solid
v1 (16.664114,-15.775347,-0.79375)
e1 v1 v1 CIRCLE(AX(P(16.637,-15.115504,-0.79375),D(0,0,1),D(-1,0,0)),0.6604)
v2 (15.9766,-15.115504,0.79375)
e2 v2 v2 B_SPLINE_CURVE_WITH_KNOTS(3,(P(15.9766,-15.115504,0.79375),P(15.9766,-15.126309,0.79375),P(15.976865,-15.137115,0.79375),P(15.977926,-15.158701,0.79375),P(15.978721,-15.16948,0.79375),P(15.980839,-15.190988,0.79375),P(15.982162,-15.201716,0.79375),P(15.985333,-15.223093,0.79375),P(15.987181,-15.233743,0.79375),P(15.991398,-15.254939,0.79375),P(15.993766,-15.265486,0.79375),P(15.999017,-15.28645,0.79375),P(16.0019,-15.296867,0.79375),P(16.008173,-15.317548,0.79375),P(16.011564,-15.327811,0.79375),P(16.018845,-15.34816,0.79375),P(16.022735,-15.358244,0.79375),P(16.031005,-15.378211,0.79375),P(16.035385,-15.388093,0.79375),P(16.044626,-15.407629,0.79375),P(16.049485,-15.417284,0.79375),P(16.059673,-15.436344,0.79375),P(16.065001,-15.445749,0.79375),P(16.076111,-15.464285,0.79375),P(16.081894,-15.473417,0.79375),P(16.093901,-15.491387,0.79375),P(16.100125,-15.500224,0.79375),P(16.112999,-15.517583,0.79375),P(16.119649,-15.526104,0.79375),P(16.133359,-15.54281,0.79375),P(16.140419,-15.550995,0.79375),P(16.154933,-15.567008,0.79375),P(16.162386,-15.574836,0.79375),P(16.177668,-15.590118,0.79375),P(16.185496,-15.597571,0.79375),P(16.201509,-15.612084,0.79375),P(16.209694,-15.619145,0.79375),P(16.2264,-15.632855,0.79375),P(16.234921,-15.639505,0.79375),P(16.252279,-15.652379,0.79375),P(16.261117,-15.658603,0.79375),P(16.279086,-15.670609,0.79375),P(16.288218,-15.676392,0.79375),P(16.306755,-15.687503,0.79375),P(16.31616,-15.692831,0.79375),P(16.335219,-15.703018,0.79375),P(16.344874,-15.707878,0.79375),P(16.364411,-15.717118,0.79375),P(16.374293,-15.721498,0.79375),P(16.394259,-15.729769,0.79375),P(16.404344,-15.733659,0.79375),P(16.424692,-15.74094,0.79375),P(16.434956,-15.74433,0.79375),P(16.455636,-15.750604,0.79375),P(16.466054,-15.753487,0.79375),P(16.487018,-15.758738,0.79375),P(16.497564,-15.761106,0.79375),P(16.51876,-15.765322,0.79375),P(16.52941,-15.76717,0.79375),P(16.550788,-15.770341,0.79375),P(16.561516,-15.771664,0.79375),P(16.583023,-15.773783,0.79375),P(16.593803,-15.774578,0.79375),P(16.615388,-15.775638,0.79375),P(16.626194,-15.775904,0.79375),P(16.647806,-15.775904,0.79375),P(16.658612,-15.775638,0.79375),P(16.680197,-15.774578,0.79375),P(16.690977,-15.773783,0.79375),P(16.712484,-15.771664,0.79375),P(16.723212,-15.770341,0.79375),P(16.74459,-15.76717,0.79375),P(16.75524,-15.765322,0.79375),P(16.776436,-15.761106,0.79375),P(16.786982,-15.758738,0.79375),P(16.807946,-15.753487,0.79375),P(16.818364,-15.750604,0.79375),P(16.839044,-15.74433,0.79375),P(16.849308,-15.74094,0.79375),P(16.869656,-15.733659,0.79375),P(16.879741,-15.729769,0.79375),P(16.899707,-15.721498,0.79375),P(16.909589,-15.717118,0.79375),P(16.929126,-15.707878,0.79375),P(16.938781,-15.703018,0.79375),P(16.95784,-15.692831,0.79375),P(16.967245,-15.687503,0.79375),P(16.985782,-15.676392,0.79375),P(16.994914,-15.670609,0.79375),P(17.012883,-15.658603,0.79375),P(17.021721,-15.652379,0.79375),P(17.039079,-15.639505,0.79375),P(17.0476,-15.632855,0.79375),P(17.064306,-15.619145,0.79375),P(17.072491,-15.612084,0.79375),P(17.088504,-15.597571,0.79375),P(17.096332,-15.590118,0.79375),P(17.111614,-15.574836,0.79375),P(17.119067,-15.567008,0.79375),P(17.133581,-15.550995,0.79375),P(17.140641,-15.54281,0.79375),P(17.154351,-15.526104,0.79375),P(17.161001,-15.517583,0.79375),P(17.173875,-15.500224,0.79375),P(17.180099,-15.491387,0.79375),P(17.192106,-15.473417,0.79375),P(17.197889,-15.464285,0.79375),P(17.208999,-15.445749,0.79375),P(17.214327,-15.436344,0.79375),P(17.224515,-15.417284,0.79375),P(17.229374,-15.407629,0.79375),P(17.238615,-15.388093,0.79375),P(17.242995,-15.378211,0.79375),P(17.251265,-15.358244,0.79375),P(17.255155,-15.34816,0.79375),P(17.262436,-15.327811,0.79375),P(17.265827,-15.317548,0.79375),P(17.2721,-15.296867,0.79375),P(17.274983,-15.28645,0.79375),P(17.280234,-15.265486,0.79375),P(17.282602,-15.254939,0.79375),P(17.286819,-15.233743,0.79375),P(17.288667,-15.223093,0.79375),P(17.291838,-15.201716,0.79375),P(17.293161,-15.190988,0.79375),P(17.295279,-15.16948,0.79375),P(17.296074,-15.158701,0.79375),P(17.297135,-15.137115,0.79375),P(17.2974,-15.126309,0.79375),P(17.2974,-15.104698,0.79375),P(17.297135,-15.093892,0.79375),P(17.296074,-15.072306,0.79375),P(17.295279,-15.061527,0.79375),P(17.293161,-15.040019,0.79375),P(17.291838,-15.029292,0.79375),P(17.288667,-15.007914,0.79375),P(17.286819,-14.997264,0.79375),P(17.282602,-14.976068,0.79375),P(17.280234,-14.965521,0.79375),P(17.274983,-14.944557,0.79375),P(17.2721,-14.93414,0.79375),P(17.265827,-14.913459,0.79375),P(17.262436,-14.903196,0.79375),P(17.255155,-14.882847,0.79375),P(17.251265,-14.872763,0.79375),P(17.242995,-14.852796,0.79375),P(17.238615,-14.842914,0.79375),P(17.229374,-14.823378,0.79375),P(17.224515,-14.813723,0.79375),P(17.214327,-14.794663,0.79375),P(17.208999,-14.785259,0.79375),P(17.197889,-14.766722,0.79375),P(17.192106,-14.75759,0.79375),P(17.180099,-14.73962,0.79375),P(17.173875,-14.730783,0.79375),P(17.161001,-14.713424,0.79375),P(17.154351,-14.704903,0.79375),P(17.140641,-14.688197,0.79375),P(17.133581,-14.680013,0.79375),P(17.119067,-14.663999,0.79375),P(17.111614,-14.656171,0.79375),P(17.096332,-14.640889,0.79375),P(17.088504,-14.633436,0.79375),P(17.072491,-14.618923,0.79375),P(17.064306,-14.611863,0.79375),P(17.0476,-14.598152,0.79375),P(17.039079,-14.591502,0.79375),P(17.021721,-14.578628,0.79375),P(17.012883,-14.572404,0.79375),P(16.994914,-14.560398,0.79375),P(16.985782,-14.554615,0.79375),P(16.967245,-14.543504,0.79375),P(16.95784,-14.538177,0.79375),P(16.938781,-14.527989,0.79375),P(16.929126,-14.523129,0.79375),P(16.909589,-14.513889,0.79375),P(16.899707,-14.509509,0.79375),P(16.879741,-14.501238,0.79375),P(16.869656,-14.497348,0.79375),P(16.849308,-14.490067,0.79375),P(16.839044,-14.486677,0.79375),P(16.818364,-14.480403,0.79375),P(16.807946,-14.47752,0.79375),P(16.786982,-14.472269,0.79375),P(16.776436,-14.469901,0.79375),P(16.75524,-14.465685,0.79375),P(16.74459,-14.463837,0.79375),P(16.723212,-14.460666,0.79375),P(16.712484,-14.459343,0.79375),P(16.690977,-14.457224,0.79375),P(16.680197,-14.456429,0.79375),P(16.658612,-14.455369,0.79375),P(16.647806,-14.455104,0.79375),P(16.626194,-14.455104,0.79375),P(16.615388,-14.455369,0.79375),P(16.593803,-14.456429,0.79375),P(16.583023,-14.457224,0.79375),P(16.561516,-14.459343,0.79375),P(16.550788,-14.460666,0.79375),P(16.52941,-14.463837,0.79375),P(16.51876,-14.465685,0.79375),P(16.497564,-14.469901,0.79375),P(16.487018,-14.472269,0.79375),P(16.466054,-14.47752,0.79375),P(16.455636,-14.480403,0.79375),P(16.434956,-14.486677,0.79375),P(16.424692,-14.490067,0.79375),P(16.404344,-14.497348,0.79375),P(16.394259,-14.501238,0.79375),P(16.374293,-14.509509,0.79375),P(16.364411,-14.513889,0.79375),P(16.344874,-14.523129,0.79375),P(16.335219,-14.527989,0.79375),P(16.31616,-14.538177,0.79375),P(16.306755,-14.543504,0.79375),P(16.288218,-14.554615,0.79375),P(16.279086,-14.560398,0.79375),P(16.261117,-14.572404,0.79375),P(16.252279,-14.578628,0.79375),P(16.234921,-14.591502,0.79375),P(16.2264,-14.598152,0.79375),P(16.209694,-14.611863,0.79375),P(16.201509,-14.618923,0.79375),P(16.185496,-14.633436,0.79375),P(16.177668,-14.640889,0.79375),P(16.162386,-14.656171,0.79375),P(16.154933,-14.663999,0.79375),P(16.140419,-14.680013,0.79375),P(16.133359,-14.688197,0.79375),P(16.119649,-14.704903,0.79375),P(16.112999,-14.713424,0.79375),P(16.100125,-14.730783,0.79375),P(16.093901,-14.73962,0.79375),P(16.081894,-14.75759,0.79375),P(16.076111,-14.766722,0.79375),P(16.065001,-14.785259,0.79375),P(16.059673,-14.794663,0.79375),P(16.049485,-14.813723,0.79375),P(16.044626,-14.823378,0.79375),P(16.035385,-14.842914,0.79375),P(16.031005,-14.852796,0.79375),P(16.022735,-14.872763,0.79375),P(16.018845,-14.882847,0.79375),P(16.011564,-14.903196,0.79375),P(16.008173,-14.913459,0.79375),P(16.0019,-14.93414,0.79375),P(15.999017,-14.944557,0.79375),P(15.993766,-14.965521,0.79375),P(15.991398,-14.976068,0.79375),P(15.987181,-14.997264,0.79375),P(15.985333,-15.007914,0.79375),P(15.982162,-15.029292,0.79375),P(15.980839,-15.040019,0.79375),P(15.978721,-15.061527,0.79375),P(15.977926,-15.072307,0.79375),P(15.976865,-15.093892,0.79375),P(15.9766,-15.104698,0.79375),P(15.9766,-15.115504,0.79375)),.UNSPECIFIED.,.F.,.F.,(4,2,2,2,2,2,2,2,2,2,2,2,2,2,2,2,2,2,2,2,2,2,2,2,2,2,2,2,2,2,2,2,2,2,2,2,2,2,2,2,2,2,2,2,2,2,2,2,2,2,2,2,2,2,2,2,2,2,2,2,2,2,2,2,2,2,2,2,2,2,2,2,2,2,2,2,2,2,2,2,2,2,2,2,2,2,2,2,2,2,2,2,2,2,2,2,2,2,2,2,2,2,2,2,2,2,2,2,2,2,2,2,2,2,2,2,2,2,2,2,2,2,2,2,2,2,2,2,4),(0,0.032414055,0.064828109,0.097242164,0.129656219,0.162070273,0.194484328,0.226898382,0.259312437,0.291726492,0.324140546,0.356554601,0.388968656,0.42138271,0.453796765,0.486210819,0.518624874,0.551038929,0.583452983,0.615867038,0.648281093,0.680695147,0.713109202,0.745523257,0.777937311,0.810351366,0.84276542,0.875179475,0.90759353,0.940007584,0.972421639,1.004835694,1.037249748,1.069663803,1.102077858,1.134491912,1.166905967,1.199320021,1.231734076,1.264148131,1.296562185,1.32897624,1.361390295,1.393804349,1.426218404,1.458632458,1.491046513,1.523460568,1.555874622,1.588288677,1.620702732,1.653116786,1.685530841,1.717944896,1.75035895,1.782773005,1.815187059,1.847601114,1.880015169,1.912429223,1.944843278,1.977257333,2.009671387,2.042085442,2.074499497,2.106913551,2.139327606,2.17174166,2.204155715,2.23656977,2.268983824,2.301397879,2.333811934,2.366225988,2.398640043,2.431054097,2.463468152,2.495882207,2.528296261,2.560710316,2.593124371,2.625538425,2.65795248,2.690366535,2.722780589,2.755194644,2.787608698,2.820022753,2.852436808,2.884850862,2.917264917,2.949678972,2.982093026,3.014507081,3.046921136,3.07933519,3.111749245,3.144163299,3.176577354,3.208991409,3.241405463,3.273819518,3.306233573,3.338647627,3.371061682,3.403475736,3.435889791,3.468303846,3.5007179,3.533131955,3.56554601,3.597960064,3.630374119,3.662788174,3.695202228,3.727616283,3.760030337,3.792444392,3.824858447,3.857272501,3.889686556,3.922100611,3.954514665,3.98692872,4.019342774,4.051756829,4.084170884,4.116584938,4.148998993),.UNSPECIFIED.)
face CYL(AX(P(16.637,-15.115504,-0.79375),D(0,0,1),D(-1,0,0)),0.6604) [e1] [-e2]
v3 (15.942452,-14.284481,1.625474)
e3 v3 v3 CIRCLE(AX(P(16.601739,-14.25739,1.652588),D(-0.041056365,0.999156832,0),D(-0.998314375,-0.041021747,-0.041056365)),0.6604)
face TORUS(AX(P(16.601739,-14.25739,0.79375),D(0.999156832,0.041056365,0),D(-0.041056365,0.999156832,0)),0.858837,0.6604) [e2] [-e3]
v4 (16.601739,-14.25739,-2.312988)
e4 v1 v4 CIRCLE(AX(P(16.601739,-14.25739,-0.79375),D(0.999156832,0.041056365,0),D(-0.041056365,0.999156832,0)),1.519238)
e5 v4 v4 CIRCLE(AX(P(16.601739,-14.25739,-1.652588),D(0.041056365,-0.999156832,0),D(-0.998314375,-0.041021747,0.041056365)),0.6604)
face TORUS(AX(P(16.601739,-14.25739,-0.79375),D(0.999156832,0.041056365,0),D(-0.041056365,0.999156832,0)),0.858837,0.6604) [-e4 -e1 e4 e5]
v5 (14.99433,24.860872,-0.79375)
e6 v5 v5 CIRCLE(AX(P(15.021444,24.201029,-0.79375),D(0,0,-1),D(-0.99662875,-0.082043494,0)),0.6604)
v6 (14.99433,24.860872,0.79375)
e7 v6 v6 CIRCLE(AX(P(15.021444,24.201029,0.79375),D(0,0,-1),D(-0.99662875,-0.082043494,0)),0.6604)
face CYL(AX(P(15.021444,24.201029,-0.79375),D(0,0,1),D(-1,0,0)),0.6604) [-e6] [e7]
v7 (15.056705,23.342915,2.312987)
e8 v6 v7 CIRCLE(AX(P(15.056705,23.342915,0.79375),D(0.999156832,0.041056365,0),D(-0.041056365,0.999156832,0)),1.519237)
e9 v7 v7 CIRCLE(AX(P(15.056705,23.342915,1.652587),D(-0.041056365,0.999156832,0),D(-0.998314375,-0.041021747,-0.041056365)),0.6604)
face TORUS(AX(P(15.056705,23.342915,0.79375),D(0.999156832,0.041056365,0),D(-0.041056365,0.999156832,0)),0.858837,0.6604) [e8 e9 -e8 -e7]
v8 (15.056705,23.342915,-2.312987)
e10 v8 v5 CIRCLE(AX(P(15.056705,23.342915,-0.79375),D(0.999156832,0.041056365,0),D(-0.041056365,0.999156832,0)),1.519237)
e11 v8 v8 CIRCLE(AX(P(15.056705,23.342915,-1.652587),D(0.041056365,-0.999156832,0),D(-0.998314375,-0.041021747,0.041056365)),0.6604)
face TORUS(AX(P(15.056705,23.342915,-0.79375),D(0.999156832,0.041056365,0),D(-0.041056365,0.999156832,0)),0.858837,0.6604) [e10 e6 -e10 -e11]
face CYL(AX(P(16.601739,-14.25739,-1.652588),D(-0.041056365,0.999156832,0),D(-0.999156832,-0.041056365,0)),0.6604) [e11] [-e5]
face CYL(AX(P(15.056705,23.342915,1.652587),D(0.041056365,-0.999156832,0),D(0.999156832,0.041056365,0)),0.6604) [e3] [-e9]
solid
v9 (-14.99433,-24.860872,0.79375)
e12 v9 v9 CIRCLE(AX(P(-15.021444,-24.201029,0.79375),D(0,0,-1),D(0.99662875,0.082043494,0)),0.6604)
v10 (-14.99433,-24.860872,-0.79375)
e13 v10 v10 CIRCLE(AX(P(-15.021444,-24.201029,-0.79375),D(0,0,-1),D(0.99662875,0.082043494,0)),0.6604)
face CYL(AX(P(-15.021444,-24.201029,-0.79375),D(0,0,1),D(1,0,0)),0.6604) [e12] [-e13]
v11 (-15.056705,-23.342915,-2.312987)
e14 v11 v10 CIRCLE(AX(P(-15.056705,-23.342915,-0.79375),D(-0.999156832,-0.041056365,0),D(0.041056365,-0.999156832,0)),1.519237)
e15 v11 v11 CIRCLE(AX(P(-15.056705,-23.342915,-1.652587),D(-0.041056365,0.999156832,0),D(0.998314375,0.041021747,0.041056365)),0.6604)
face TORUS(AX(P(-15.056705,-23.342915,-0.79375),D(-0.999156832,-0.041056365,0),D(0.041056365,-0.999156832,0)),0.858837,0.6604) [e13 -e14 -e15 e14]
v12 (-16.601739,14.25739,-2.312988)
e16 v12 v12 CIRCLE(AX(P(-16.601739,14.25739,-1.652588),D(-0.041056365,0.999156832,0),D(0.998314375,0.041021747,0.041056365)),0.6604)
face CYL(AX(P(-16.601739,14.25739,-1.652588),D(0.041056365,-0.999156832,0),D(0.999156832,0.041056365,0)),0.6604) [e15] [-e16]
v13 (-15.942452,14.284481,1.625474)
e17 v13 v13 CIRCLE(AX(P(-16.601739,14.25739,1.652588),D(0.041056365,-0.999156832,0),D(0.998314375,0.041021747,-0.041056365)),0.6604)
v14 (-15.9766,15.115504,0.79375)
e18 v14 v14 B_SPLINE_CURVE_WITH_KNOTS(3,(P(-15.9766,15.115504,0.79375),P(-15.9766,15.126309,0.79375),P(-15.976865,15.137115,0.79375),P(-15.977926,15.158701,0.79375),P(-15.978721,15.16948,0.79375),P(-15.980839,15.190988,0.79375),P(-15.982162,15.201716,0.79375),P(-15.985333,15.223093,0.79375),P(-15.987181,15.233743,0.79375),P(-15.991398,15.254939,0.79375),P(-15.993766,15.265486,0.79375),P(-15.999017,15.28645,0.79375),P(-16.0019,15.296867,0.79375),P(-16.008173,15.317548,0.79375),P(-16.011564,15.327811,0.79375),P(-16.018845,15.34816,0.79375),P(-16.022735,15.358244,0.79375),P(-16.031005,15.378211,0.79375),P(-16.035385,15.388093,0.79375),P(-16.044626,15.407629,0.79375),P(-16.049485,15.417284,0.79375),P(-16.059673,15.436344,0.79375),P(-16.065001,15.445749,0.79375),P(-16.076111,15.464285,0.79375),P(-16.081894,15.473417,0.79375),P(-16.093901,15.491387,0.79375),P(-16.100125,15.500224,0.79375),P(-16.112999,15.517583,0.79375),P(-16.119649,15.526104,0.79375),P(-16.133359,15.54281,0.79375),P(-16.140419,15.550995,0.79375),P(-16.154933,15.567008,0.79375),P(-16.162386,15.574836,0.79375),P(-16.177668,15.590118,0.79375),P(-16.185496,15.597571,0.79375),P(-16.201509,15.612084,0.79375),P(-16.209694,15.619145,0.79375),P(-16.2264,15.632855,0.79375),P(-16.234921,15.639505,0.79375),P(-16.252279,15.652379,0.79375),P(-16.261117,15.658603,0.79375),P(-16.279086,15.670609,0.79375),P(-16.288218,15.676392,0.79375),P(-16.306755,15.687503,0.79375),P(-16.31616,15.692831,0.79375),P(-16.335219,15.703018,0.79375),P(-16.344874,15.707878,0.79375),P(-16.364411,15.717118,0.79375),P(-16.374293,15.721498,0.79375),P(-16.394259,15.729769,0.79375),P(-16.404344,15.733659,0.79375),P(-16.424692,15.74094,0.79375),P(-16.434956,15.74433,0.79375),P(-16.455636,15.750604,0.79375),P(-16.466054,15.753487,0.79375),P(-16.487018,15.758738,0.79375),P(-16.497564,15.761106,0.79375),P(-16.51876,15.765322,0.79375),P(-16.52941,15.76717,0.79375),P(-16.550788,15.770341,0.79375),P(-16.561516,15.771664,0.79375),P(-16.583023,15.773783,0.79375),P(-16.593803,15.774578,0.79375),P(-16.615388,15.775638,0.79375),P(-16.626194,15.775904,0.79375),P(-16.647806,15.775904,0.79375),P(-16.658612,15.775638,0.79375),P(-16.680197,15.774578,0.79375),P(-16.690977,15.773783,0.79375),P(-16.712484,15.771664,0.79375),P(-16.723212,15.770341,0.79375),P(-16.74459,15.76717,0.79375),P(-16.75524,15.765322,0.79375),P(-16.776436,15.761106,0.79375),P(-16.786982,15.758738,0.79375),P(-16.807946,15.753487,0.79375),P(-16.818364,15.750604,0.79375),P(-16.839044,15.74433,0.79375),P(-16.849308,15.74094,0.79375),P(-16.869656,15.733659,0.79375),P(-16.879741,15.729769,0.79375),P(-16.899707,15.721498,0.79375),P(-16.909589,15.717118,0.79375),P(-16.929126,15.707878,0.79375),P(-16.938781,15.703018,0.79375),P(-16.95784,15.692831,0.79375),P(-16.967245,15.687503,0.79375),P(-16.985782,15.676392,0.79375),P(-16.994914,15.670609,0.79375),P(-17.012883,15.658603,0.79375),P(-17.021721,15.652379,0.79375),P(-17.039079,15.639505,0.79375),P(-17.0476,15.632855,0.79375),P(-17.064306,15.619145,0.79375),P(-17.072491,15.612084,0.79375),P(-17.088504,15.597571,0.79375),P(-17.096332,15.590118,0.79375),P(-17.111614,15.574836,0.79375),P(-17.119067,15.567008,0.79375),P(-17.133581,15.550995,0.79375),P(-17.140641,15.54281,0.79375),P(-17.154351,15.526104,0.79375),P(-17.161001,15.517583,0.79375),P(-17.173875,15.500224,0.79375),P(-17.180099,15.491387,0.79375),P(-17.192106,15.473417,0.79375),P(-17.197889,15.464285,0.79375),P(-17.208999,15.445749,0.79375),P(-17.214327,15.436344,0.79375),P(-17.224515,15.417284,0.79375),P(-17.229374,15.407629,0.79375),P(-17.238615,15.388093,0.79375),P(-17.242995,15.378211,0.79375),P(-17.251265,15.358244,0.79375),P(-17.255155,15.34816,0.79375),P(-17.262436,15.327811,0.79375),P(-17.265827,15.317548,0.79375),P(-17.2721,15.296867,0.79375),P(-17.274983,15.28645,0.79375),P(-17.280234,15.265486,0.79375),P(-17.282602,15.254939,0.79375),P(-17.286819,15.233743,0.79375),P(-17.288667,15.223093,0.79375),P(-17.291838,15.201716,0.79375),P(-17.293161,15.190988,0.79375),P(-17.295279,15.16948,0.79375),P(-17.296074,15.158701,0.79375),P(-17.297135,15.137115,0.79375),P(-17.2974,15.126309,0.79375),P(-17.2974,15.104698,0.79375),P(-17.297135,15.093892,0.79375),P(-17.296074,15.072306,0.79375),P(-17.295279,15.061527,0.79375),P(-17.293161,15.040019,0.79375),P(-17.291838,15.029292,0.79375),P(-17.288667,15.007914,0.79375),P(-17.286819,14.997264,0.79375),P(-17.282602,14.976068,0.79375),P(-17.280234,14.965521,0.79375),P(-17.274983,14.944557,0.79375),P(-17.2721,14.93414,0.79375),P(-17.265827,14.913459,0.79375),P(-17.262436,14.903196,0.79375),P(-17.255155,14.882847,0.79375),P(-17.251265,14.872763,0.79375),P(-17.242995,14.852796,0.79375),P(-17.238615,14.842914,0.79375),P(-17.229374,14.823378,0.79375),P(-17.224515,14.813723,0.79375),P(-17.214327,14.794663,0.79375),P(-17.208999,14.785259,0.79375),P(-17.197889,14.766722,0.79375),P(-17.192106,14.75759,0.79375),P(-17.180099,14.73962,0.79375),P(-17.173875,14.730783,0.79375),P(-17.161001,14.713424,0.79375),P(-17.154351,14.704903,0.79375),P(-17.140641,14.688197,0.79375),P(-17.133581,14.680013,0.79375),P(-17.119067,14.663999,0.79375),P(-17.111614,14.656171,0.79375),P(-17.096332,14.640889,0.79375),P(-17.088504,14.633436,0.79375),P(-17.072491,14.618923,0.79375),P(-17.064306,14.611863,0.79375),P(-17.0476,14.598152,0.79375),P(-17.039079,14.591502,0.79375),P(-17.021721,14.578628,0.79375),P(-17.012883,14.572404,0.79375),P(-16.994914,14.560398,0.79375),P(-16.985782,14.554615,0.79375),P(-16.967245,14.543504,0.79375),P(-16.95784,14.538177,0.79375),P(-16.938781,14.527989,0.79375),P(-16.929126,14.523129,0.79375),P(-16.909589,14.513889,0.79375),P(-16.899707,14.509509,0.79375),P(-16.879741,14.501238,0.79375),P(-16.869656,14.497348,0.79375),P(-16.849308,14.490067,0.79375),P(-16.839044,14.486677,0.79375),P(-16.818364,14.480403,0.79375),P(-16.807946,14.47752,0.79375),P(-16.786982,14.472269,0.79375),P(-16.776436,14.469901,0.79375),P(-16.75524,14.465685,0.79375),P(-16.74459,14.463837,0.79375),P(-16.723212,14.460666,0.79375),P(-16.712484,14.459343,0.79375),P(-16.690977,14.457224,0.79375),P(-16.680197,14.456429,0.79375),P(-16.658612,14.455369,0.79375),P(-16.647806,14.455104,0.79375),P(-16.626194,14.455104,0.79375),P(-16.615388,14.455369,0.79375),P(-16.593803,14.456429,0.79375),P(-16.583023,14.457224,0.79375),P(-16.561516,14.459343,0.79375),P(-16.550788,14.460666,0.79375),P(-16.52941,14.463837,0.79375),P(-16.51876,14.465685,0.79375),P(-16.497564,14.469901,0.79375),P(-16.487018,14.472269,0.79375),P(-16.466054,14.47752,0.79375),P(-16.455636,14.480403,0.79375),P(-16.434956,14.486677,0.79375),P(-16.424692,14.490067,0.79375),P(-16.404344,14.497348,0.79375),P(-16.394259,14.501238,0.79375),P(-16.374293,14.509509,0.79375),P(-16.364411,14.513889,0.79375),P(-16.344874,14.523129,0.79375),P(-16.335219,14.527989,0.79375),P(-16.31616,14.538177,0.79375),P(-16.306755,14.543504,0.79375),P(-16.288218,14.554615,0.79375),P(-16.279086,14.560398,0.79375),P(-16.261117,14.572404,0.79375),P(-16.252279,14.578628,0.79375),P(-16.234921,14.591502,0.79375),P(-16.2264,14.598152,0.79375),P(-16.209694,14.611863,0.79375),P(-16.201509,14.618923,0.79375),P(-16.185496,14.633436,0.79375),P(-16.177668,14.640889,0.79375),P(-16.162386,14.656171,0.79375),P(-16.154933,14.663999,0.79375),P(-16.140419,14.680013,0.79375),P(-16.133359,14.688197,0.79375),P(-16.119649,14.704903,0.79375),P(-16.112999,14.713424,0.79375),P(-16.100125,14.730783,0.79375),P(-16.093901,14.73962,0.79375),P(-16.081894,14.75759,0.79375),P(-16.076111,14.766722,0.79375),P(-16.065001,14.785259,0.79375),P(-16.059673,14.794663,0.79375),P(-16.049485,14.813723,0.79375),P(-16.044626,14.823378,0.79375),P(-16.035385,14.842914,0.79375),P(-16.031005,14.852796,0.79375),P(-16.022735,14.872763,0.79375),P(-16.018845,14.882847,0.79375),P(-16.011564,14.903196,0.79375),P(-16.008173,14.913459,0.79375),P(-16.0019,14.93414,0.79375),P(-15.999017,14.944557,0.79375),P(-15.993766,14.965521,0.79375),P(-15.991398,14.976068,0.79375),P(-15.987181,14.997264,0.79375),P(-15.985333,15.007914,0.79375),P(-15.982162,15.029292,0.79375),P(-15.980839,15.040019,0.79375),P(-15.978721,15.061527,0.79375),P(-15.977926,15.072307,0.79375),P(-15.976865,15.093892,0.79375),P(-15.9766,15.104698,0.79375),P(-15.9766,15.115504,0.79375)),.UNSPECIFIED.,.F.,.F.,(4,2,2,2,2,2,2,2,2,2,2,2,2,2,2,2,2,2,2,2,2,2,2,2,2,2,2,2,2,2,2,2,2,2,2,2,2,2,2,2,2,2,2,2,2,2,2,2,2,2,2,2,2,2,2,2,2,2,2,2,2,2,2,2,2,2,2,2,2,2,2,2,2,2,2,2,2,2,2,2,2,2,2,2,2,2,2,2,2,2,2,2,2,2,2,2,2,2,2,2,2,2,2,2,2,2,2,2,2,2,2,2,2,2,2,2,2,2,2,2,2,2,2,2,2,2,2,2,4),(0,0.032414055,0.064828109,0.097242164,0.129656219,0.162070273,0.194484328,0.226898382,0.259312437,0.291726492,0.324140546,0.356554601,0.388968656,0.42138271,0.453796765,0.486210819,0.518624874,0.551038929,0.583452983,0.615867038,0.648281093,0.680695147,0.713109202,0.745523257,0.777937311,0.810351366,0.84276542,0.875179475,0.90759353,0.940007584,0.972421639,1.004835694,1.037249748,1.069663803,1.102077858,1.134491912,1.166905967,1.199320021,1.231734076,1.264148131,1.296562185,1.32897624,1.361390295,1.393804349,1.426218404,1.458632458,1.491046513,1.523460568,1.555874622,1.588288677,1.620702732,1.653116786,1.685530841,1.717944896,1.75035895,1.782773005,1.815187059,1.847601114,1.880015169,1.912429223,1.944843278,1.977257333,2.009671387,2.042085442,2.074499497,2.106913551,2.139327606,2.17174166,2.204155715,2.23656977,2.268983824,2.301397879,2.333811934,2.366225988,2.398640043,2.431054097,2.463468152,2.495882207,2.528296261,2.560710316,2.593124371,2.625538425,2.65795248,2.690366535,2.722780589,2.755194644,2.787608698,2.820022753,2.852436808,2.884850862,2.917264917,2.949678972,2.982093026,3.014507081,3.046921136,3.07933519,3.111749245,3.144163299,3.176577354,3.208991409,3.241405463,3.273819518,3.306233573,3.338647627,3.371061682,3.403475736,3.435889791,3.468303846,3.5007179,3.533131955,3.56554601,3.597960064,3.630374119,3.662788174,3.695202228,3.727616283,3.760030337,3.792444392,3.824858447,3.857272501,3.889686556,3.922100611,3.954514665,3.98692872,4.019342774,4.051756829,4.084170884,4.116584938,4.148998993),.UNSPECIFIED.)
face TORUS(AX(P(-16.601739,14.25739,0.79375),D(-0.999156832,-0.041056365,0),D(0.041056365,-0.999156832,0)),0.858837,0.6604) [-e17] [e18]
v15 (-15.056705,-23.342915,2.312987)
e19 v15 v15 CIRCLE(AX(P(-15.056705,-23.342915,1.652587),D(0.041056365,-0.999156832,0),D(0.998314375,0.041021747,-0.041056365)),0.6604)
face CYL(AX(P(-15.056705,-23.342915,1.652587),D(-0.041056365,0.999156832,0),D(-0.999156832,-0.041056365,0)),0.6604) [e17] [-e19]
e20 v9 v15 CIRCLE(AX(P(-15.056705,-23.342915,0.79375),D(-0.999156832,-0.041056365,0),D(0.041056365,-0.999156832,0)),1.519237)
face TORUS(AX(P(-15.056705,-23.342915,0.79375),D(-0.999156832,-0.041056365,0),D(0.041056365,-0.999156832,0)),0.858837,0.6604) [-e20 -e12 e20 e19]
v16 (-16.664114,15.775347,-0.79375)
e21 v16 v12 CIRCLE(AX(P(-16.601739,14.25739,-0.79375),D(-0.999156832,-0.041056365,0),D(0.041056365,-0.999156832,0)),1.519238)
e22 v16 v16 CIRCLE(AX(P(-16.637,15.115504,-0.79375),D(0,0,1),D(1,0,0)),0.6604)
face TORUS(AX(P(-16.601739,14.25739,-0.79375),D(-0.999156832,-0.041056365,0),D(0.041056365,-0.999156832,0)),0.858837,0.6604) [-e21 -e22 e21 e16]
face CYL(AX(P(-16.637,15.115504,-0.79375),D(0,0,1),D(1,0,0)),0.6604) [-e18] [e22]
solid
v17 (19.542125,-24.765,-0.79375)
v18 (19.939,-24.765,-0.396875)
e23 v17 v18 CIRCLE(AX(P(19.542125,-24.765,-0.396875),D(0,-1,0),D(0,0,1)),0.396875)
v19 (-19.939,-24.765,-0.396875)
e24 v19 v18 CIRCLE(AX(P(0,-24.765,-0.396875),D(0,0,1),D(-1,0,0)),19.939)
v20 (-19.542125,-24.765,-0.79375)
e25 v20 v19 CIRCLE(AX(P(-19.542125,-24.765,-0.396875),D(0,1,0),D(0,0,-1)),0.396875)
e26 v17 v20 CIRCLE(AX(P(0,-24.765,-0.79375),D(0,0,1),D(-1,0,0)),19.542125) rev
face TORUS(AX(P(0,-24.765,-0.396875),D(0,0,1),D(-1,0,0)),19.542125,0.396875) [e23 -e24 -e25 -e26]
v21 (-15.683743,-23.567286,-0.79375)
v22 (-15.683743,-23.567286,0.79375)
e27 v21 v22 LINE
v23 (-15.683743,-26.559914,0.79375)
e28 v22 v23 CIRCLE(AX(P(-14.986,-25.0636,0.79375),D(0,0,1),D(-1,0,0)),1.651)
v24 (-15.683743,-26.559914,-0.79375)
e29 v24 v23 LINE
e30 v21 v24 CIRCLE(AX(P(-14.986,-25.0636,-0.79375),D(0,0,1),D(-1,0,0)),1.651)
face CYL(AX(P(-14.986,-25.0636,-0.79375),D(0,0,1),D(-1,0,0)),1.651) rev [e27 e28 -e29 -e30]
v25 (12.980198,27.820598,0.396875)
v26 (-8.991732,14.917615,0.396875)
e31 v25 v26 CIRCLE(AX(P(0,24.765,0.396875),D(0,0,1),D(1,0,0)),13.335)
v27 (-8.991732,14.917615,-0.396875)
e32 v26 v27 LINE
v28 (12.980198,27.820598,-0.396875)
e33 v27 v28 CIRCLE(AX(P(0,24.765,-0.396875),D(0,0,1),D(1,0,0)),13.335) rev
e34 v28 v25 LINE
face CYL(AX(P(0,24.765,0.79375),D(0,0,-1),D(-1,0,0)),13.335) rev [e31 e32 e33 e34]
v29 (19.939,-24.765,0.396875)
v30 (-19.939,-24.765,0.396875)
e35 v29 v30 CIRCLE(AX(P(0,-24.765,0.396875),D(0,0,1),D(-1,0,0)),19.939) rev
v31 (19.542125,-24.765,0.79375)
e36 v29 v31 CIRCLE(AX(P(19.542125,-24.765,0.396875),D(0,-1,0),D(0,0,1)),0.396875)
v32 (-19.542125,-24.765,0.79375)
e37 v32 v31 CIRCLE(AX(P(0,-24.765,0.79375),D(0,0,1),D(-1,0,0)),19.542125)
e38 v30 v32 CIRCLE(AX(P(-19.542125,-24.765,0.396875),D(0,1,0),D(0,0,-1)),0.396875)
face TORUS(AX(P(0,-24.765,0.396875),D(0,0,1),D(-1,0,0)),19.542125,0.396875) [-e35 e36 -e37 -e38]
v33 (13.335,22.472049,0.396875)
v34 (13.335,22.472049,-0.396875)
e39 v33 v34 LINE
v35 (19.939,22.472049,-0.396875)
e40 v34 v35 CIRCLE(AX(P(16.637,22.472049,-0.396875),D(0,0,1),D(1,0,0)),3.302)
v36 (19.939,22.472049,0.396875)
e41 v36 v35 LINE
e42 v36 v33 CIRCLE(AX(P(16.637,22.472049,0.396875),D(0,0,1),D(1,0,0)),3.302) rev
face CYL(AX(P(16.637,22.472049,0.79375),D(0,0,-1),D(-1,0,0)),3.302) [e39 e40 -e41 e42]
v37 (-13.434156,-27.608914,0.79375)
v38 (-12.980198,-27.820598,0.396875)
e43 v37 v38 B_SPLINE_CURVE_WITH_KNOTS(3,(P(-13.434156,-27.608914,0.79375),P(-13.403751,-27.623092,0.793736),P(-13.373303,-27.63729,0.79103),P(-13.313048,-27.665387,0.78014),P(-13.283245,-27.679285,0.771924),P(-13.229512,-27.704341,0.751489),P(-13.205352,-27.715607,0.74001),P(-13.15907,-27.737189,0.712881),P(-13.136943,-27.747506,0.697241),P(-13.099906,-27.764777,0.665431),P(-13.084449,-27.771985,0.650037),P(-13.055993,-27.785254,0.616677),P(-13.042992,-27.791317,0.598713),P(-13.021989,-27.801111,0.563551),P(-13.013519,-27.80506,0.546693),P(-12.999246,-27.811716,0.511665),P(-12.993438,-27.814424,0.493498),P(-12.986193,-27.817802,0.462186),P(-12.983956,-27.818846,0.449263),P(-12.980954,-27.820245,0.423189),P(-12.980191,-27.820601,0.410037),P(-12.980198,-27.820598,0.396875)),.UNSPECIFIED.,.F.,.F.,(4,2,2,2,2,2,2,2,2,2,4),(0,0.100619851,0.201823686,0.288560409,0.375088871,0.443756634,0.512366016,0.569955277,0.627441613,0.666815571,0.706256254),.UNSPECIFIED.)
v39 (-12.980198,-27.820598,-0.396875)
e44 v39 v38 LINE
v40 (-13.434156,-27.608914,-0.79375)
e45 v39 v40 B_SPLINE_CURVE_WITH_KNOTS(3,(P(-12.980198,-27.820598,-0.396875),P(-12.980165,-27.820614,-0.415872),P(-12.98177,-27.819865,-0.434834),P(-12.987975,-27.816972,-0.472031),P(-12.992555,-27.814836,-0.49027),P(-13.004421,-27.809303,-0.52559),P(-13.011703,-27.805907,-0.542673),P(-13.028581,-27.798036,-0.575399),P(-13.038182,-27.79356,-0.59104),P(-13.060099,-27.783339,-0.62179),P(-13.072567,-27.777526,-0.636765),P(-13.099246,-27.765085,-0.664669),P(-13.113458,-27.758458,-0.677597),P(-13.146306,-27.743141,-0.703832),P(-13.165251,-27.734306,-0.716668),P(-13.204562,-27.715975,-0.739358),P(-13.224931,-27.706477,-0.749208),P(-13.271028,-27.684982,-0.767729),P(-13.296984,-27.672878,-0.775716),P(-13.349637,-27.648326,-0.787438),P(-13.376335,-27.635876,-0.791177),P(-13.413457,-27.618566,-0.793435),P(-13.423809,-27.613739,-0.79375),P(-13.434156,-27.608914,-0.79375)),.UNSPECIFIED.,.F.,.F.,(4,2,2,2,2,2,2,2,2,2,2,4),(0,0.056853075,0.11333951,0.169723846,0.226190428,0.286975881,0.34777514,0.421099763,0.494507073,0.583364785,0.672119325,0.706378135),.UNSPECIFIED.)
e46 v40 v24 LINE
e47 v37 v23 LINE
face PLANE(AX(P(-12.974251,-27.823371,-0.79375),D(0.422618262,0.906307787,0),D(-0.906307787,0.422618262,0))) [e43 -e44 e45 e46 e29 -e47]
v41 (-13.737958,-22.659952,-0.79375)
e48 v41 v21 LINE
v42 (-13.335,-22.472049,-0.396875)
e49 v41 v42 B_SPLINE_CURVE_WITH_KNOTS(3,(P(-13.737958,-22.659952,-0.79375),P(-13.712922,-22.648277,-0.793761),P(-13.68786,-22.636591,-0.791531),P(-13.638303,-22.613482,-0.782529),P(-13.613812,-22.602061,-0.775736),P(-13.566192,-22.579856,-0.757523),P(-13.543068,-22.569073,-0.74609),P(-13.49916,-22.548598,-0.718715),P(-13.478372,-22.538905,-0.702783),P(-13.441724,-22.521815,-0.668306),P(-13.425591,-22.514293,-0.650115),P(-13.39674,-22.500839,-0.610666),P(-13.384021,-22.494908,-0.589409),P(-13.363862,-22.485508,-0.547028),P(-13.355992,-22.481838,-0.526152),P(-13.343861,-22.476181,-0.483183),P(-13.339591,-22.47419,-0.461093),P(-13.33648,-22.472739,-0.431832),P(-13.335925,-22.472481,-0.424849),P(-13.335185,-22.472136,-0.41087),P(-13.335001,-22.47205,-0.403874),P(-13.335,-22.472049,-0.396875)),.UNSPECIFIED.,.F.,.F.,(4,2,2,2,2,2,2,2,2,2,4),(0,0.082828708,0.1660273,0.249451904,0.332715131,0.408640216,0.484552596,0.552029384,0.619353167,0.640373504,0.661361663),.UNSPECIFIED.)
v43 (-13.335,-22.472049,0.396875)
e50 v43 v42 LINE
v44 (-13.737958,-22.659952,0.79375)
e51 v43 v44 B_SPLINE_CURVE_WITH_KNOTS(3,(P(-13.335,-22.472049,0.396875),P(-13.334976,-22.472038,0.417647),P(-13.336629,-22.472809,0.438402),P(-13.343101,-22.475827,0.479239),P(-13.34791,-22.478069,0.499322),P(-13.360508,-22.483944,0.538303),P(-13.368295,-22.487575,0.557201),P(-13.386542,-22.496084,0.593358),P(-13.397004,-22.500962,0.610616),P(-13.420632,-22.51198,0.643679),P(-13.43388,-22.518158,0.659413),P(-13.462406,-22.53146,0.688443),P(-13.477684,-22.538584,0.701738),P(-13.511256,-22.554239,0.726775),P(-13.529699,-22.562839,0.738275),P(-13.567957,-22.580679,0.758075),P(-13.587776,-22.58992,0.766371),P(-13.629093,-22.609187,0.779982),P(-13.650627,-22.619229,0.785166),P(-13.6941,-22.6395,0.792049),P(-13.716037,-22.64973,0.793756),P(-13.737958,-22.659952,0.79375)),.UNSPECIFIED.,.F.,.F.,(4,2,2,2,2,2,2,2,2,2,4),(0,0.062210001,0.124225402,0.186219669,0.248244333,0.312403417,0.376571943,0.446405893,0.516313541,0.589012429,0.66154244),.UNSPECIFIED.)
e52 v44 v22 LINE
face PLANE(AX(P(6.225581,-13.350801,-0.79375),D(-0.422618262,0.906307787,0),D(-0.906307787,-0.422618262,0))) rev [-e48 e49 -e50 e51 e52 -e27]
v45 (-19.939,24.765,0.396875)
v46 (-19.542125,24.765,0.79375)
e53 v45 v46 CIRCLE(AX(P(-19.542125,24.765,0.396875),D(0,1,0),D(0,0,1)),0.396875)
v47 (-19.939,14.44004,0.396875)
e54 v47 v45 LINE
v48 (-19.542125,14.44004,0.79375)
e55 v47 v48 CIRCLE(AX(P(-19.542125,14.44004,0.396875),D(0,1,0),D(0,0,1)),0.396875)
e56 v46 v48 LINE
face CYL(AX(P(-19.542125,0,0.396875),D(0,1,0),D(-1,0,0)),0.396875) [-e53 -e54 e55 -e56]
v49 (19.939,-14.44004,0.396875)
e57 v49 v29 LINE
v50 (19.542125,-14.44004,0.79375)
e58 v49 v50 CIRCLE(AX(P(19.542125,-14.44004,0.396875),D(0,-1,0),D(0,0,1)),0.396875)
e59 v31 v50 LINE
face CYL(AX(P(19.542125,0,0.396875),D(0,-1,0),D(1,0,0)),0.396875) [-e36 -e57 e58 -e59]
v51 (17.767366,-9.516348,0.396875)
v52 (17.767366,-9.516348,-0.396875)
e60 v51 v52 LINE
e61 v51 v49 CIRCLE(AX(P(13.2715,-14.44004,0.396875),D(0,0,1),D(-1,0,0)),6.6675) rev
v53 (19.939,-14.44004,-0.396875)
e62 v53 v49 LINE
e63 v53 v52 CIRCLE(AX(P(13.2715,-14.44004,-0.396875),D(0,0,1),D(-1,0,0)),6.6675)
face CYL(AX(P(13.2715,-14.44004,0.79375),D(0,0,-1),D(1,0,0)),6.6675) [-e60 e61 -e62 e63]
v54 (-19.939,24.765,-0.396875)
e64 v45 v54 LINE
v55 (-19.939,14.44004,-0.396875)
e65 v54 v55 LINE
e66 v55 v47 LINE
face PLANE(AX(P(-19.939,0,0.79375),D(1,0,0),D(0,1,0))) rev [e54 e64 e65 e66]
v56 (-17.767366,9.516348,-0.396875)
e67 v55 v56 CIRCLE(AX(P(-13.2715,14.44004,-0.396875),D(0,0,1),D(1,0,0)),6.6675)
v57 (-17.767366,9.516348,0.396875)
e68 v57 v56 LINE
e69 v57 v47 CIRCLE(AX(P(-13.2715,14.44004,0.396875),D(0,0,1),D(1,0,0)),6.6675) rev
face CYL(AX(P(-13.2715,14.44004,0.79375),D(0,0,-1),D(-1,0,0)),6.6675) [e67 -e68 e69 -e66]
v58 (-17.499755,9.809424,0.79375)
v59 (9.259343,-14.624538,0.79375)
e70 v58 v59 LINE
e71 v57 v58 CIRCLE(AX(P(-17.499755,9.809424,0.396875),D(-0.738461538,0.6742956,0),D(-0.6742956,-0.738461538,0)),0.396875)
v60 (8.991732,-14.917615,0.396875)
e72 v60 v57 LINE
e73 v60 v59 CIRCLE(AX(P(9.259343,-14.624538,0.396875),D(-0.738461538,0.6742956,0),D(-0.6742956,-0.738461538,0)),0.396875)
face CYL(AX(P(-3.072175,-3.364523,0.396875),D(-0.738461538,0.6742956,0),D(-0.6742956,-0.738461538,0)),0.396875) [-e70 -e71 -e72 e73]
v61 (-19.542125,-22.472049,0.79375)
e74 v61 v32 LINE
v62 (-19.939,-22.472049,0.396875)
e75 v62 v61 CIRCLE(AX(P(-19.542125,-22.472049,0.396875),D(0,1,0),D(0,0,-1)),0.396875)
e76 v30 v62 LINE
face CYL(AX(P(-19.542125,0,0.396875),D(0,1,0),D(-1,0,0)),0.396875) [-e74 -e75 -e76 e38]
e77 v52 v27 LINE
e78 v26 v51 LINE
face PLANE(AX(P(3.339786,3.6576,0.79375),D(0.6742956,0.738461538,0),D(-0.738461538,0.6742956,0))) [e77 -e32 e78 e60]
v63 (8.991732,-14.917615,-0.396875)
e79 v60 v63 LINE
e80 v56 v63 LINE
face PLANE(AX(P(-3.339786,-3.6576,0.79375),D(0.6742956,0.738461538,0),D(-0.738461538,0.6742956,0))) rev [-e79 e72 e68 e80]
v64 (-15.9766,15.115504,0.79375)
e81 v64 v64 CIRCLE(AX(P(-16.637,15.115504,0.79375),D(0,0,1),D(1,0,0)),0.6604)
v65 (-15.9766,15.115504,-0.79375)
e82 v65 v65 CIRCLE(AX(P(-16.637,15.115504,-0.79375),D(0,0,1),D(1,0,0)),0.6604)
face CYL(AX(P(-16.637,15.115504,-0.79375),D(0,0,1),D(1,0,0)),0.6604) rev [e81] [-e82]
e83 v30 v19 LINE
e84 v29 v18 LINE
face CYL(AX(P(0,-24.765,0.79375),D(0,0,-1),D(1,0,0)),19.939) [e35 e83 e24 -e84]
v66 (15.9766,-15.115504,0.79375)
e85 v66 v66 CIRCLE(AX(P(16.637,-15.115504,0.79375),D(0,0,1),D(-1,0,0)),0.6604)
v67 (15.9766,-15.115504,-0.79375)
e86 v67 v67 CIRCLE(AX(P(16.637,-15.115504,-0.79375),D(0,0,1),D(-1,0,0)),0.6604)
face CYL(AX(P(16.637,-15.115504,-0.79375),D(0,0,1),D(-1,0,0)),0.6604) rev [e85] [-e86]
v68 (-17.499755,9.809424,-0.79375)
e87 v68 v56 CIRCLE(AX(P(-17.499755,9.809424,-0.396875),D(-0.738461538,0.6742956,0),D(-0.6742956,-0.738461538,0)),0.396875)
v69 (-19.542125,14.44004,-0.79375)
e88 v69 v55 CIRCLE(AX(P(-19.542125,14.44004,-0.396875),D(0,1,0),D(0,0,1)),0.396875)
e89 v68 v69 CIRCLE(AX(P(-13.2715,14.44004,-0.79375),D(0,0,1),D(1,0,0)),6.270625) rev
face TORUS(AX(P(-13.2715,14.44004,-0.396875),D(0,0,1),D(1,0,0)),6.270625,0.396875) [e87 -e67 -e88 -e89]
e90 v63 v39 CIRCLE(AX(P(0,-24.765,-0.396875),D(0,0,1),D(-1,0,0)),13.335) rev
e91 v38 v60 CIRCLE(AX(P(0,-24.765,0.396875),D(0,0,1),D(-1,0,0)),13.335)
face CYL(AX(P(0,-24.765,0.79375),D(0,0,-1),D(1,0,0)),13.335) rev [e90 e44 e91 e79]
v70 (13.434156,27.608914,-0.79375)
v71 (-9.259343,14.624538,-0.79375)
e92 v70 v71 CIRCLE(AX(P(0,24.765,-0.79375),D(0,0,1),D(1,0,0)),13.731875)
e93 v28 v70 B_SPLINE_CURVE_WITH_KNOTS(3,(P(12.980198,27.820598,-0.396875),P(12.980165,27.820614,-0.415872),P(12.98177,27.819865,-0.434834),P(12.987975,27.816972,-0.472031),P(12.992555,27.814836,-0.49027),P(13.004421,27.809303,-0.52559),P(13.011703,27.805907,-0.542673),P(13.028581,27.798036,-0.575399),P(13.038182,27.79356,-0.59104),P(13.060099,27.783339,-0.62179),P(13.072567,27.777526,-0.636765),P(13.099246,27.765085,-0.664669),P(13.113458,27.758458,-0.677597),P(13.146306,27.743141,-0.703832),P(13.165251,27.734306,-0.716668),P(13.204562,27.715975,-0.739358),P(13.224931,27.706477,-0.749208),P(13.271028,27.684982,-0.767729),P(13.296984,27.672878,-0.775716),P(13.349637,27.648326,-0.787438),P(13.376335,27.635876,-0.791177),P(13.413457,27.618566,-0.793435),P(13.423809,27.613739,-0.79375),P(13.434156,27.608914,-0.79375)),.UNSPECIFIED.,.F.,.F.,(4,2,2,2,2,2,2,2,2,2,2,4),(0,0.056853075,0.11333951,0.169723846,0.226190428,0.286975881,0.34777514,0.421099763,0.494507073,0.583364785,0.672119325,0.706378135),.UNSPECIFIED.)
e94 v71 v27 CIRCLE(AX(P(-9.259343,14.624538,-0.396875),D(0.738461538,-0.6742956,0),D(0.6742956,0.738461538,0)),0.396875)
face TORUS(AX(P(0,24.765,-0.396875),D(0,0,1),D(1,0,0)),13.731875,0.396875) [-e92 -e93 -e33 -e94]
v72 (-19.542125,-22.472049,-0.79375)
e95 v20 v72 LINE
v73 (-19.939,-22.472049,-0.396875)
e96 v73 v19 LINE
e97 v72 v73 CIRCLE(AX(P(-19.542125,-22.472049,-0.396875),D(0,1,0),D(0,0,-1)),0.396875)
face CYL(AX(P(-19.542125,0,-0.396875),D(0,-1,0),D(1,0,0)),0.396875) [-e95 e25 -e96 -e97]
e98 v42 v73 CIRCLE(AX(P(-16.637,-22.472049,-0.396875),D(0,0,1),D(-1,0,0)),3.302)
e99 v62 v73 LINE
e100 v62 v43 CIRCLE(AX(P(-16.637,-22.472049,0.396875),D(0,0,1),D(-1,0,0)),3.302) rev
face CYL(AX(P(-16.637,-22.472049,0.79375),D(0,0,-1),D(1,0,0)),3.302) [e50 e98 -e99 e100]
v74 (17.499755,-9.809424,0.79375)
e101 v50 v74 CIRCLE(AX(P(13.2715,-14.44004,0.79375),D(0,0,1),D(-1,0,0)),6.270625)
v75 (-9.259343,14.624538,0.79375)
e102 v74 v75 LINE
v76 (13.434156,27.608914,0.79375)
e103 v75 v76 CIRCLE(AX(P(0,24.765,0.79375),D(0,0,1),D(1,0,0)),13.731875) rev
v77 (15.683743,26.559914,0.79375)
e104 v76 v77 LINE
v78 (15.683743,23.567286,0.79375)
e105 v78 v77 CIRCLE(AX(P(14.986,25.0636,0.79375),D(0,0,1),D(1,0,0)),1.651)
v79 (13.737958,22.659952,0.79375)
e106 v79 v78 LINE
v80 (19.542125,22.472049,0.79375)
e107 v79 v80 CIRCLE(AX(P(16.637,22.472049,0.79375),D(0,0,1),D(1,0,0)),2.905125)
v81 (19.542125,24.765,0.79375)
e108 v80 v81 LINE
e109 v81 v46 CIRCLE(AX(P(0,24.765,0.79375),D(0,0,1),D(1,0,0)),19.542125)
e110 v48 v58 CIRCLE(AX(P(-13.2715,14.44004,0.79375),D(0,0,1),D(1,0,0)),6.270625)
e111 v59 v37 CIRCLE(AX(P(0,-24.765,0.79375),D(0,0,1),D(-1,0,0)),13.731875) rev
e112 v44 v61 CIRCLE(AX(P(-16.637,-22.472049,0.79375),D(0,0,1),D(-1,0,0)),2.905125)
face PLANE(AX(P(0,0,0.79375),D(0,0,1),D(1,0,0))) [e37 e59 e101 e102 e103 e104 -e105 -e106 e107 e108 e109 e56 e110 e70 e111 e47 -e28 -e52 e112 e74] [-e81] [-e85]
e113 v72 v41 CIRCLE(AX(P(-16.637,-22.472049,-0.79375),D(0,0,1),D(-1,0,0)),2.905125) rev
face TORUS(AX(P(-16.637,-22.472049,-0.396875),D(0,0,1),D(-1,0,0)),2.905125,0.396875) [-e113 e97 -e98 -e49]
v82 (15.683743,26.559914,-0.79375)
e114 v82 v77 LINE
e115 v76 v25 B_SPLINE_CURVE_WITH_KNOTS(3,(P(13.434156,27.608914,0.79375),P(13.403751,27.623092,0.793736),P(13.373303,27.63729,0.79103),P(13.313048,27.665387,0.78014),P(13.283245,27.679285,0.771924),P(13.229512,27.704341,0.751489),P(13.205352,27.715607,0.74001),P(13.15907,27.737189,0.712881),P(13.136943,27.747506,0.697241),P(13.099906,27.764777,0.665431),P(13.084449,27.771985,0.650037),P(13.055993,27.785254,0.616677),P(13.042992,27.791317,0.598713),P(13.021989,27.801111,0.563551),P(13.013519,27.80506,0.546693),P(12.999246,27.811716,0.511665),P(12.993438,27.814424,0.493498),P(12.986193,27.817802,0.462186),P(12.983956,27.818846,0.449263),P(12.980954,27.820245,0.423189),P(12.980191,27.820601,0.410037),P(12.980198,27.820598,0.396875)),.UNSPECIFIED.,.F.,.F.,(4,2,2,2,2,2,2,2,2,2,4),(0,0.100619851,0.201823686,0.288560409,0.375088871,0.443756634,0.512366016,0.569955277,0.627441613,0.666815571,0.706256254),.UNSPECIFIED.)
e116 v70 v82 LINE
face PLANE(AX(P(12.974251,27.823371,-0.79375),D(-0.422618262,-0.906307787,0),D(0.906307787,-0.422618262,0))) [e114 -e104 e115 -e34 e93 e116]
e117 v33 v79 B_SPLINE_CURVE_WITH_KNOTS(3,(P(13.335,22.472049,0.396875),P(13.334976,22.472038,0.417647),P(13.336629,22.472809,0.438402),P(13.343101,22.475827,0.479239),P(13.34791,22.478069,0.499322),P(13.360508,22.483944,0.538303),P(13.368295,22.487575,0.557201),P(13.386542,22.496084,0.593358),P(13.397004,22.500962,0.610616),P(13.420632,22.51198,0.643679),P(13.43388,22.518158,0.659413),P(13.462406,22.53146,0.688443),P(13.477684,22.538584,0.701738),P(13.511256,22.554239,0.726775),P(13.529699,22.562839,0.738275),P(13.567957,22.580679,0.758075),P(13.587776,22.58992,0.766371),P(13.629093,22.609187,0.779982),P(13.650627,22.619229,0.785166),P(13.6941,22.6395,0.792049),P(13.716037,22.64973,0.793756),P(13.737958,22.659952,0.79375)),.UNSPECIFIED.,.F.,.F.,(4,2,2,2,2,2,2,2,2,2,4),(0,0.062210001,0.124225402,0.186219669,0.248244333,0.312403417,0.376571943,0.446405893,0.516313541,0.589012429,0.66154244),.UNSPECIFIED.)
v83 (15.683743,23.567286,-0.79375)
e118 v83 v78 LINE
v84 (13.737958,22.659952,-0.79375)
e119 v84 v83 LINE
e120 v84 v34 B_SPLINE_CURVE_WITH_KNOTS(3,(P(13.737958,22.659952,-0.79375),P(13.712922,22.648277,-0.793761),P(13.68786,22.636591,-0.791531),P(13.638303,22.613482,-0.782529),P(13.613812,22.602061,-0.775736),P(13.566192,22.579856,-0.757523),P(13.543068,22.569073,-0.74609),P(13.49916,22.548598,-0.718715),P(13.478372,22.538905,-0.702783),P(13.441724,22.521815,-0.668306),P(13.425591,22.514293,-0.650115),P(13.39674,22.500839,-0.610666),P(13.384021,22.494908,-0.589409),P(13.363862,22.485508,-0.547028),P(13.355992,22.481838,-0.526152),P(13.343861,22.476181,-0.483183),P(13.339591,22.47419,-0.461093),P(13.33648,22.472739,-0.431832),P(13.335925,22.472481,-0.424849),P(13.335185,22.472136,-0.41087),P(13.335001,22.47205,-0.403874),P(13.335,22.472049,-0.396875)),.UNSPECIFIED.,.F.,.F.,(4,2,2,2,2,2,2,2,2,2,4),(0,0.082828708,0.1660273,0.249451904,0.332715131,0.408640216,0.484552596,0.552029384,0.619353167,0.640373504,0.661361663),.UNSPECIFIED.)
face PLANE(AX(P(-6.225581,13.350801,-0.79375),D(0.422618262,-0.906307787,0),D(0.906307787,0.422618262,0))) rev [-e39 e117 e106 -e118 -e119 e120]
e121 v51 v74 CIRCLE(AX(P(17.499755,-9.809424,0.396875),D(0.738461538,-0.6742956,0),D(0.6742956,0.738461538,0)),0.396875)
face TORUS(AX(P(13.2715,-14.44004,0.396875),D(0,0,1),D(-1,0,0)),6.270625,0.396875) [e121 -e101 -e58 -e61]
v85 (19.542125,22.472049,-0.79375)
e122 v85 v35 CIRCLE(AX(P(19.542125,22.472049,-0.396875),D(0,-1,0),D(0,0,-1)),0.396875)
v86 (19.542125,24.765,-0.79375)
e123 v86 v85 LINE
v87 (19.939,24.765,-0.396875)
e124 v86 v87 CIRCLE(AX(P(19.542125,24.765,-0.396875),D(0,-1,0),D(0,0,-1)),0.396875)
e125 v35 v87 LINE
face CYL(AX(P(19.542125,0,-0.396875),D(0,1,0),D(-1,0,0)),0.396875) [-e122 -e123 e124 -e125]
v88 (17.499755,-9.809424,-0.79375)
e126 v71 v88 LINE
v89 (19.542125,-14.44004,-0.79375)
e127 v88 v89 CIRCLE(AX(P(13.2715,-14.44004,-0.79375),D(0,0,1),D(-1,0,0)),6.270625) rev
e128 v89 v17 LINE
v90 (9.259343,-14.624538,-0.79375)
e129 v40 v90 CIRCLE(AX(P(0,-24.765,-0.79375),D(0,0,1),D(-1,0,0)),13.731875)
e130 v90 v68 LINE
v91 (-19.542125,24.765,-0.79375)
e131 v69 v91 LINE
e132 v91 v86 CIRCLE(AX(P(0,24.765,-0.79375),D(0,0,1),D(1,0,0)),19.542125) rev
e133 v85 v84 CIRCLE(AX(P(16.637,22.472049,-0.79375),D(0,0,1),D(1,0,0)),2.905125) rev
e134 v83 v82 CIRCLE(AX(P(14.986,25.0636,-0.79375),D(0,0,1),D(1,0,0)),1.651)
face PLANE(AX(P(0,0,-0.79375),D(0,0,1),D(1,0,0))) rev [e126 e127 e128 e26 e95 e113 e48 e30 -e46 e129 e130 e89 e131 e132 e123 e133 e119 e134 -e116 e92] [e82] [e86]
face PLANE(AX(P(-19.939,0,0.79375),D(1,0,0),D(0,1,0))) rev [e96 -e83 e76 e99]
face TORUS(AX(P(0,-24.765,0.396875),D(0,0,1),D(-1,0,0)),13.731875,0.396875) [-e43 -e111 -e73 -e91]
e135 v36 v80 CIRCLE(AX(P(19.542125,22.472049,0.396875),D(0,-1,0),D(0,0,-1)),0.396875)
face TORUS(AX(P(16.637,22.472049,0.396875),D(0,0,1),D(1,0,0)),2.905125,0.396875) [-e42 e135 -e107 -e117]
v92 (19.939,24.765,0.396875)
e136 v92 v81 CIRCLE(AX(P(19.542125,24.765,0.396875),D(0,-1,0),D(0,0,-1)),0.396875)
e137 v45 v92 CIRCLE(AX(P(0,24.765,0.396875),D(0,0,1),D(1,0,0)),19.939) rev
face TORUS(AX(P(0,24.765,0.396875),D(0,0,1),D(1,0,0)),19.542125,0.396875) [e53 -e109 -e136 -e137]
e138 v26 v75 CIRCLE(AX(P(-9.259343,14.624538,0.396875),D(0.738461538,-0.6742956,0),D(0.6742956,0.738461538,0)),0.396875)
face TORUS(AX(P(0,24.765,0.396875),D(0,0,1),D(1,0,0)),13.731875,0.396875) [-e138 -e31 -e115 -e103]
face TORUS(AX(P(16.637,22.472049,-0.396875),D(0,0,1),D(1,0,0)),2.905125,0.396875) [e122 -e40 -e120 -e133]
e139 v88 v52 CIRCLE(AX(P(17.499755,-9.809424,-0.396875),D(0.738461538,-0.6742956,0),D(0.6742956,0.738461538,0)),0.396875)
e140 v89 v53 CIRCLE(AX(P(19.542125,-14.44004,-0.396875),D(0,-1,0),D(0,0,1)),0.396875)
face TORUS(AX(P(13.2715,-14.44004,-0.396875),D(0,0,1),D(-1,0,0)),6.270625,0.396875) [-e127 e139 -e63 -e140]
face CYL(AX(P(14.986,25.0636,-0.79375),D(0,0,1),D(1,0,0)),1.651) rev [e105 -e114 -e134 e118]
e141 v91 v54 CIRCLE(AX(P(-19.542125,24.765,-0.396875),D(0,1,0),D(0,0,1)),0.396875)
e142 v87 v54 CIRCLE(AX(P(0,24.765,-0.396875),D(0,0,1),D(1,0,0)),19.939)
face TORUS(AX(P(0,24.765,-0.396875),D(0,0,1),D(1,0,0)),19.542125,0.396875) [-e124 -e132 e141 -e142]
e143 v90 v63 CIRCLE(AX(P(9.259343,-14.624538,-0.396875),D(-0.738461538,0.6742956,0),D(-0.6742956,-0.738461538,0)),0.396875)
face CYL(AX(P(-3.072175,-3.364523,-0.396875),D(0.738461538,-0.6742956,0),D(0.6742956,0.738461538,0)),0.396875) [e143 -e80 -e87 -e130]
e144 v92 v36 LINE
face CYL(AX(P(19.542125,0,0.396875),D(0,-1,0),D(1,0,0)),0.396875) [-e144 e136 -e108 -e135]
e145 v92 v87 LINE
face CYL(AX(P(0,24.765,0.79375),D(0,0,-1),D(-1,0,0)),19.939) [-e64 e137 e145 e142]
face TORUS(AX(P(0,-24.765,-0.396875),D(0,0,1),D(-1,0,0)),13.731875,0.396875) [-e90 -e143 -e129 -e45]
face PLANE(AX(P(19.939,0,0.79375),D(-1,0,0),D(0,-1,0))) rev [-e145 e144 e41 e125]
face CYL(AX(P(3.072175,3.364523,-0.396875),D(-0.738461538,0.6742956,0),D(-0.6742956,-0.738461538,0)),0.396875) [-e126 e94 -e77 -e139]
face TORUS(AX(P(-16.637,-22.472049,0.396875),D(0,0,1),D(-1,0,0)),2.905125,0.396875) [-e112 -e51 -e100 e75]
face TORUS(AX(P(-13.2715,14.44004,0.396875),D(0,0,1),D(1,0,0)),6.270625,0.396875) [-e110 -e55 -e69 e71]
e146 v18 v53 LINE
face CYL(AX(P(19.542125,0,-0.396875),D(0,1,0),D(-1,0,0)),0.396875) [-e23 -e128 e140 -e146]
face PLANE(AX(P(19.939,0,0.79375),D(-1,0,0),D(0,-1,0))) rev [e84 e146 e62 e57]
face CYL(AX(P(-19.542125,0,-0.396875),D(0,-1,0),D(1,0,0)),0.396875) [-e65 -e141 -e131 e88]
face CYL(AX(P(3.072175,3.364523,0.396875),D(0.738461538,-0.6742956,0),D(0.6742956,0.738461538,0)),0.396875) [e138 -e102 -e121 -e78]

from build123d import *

# Parameters (mm, degrees)
BOSS_EXTRUDE1_DEPTH     = 0.79375
CUT_EXTRUDE1_DEPTH      = 49.955504043
CUT_EXTRUDE1_DEPTH_BACK = 49.955504043
SKETCH2_R               = 0.6604
FILLET1_R               = 6.6675
FILLET2_R               = 0.396875
SKETCH4_R               = 0.6604


with BuildPart() as part:
    # Sketch1 → Boss-Extrude1 (new, symmetric)
    with BuildSketch(Plane.XY):
        with BuildLine():
            Line((7.345443156, 0), (-8.991731826, 14.917615385))
            ThreePointArc((-8.991731826, 14.917615385), (-12.20096244, 19.3836674), (-13.335, 24.765))
            ThreePointArc((-13.335, 24.765), (0, 38.1), (13.335, 24.765))
            Line((13.335, 24.765), (13.335, 22.472049305))
            ThreePointArc((13.335, 22.472049305), (14.302133409, 20.137182714), (16.637, 19.170049305))
            ThreePointArc((16.637, 19.170049305), (18.971866591, 20.137182714), (19.939, 22.472049305))
            Line((19.939, 22.472049305), (19.939, 24.765))
            ThreePointArc((19.939, 24.765), (0, 44.704), (-19.939, 24.765))
            Line((-19.939, 24.765), (-19.939, 11.499285375))
            Line((-19.939, 11.499285375), (-7.345443156, 0))
            Line((-7.345443156, 0), (7.345443156, 0))
        make_face()
    extrude(amount=BOSS_EXTRUDE1_DEPTH, both=True)

    # Sketch2 → Cut-Extrude1 (cut, two sides: drawn at the far end of the back side and taken through both)
    with BuildSketch(Plane.XY.offset(-CUT_EXTRUDE1_DEPTH_BACK)):
        with BuildLine():
            Line((15.68374275, 26.55991435), (0, 33.873363702))
            Line((0, 33.873363702), (0, 16.253836684))
            Line((0, 16.253836684), (15.68374275, 23.567286037))
            ThreePointArc((15.68374275, 23.567286037), (16.637, 25.063600193), (15.68374275, 26.55991435))
        make_face()
        with Locations((-16.637, 15.115503543)):
            Circle(SKETCH2_R)
    extrude(amount=CUT_EXTRUDE1_DEPTH + CUT_EXTRUDE1_DEPTH_BACK, mode=Mode.SUBTRACT)

    # Fillet1
    fillet1_edges = [part.edges().sort_by_distance(p)[0] for p in [
        (-19.939, 11.499285375, 0),
    ]]
    fillet(fillet1_edges, radius=FILLET1_R)

    # Fillet2
    fillet2_edges = [part.edges().sort_by_distance(p)[0] for p in [
        (-0.823144335, 7.458807692, -0.79375),
        (16.637, 19.170049305, -0.79375),
        (19.939, 23.618524653, -0.79375),
        (0, 44.704, -0.79375),
        (-19.939, 19.602519934, -0.79375),
        (-19.37198122, 11.749373567, -0.79375),
        (-0.823144335, 7.458807692, 0.79375),
        (16.637, 19.170049305, 0.79375),
        (19.939, 23.618524653, 0.79375),
        (0, 44.704, 0.79375),
        (-19.939, 19.602519934, 0.79375),
        (-19.37198122, 11.749373567, 0.79375),
        (-6.752681338, 36.263848627, -0.79375),
        (-12.556404534, 4.75817378, -0.79375),
        (-6.752681338, 36.263848627, 0.79375),
        (-12.556404534, 4.75817378, 0.79375),
    ]]
    fillet(fillet2_edges, radius=FILLET2_R)


with BuildPart() as body_2:
    # Mirror1: mirrored copy
    add(part.part.mirror(Plane(origin=(0, 0, 0.79375), x_dir=(0, 0, 1), z_dir=(0, 1, 0))))


with BuildPart() as body_3:
    # Mirror2: mirrored copy
    add(body_2.part.mirror(Plane(origin=(0, 0, 0), x_dir=(0, 0, 1), z_dir=(1, 0, 0))))


with BuildPart() as part_1:
    add(part.part)

    # Combine1: union body 3
    add(body_3.part)


with BuildPart() as body_3_2:
    # Sweep1: sweep along a path in Sketch3
    with BuildLine(Plane(origin=(-15.988891892, -0.656999735, 0), x_dir=(0, 0, -1), z_dir=(0.9991568319995139, 0.04105636453334889, 0))) as sweep1_path:
        Line((0.79375, 15.125413371), (-0.79375, 15.125413371))
        ThreePointArc((-0.79375, 15.125413371), (-0.934066502, 15.067292373), (-0.9921875, 14.926975871))
        Line((-0.9921875, 14.926975871), (-0.9921875, -22.705059896))
        ThreePointArc((-0.9921875, -22.705059896), (-0.934066502, -22.845376398), (-0.79375, -22.903497396))
        Line((-0.79375, -22.903497396), (0.79375, -22.903497396))
        ThreePointArc((0.79375, -22.903497396), (0.934066502, -22.845376398), (0.9921875, -22.705059896))
        Line((0.9921875, -22.705059896), (0.9921875, 14.926975871))
        ThreePointArc((0.9921875, 14.926975871), (0.934066502, 15.067292373), (0.79375, 15.125413371))
    # Sketch4 → Sweep1 (sweep)
    with BuildSketch(Plane.XY.offset(0.79375)):
        with Locations((-16.637, 15.115503543)):
            Circle(SKETCH4_R)
    sweep(path=sweep1_path.line)


with BuildPart() as body_4:
    # Mirror3: mirrored copy
    add(body_3_2.part.mirror(Plane(origin=(0, 0, 0), x_dir=(0, 0, 1), z_dir=(1, 0, 0))))


with BuildPart() as body_5:
    # Mirror4: mirrored copy
    add(body_4.part.mirror(Plane.ZX))


solid = Compound([part_1.part, body_3_2.part, body_5.part])
